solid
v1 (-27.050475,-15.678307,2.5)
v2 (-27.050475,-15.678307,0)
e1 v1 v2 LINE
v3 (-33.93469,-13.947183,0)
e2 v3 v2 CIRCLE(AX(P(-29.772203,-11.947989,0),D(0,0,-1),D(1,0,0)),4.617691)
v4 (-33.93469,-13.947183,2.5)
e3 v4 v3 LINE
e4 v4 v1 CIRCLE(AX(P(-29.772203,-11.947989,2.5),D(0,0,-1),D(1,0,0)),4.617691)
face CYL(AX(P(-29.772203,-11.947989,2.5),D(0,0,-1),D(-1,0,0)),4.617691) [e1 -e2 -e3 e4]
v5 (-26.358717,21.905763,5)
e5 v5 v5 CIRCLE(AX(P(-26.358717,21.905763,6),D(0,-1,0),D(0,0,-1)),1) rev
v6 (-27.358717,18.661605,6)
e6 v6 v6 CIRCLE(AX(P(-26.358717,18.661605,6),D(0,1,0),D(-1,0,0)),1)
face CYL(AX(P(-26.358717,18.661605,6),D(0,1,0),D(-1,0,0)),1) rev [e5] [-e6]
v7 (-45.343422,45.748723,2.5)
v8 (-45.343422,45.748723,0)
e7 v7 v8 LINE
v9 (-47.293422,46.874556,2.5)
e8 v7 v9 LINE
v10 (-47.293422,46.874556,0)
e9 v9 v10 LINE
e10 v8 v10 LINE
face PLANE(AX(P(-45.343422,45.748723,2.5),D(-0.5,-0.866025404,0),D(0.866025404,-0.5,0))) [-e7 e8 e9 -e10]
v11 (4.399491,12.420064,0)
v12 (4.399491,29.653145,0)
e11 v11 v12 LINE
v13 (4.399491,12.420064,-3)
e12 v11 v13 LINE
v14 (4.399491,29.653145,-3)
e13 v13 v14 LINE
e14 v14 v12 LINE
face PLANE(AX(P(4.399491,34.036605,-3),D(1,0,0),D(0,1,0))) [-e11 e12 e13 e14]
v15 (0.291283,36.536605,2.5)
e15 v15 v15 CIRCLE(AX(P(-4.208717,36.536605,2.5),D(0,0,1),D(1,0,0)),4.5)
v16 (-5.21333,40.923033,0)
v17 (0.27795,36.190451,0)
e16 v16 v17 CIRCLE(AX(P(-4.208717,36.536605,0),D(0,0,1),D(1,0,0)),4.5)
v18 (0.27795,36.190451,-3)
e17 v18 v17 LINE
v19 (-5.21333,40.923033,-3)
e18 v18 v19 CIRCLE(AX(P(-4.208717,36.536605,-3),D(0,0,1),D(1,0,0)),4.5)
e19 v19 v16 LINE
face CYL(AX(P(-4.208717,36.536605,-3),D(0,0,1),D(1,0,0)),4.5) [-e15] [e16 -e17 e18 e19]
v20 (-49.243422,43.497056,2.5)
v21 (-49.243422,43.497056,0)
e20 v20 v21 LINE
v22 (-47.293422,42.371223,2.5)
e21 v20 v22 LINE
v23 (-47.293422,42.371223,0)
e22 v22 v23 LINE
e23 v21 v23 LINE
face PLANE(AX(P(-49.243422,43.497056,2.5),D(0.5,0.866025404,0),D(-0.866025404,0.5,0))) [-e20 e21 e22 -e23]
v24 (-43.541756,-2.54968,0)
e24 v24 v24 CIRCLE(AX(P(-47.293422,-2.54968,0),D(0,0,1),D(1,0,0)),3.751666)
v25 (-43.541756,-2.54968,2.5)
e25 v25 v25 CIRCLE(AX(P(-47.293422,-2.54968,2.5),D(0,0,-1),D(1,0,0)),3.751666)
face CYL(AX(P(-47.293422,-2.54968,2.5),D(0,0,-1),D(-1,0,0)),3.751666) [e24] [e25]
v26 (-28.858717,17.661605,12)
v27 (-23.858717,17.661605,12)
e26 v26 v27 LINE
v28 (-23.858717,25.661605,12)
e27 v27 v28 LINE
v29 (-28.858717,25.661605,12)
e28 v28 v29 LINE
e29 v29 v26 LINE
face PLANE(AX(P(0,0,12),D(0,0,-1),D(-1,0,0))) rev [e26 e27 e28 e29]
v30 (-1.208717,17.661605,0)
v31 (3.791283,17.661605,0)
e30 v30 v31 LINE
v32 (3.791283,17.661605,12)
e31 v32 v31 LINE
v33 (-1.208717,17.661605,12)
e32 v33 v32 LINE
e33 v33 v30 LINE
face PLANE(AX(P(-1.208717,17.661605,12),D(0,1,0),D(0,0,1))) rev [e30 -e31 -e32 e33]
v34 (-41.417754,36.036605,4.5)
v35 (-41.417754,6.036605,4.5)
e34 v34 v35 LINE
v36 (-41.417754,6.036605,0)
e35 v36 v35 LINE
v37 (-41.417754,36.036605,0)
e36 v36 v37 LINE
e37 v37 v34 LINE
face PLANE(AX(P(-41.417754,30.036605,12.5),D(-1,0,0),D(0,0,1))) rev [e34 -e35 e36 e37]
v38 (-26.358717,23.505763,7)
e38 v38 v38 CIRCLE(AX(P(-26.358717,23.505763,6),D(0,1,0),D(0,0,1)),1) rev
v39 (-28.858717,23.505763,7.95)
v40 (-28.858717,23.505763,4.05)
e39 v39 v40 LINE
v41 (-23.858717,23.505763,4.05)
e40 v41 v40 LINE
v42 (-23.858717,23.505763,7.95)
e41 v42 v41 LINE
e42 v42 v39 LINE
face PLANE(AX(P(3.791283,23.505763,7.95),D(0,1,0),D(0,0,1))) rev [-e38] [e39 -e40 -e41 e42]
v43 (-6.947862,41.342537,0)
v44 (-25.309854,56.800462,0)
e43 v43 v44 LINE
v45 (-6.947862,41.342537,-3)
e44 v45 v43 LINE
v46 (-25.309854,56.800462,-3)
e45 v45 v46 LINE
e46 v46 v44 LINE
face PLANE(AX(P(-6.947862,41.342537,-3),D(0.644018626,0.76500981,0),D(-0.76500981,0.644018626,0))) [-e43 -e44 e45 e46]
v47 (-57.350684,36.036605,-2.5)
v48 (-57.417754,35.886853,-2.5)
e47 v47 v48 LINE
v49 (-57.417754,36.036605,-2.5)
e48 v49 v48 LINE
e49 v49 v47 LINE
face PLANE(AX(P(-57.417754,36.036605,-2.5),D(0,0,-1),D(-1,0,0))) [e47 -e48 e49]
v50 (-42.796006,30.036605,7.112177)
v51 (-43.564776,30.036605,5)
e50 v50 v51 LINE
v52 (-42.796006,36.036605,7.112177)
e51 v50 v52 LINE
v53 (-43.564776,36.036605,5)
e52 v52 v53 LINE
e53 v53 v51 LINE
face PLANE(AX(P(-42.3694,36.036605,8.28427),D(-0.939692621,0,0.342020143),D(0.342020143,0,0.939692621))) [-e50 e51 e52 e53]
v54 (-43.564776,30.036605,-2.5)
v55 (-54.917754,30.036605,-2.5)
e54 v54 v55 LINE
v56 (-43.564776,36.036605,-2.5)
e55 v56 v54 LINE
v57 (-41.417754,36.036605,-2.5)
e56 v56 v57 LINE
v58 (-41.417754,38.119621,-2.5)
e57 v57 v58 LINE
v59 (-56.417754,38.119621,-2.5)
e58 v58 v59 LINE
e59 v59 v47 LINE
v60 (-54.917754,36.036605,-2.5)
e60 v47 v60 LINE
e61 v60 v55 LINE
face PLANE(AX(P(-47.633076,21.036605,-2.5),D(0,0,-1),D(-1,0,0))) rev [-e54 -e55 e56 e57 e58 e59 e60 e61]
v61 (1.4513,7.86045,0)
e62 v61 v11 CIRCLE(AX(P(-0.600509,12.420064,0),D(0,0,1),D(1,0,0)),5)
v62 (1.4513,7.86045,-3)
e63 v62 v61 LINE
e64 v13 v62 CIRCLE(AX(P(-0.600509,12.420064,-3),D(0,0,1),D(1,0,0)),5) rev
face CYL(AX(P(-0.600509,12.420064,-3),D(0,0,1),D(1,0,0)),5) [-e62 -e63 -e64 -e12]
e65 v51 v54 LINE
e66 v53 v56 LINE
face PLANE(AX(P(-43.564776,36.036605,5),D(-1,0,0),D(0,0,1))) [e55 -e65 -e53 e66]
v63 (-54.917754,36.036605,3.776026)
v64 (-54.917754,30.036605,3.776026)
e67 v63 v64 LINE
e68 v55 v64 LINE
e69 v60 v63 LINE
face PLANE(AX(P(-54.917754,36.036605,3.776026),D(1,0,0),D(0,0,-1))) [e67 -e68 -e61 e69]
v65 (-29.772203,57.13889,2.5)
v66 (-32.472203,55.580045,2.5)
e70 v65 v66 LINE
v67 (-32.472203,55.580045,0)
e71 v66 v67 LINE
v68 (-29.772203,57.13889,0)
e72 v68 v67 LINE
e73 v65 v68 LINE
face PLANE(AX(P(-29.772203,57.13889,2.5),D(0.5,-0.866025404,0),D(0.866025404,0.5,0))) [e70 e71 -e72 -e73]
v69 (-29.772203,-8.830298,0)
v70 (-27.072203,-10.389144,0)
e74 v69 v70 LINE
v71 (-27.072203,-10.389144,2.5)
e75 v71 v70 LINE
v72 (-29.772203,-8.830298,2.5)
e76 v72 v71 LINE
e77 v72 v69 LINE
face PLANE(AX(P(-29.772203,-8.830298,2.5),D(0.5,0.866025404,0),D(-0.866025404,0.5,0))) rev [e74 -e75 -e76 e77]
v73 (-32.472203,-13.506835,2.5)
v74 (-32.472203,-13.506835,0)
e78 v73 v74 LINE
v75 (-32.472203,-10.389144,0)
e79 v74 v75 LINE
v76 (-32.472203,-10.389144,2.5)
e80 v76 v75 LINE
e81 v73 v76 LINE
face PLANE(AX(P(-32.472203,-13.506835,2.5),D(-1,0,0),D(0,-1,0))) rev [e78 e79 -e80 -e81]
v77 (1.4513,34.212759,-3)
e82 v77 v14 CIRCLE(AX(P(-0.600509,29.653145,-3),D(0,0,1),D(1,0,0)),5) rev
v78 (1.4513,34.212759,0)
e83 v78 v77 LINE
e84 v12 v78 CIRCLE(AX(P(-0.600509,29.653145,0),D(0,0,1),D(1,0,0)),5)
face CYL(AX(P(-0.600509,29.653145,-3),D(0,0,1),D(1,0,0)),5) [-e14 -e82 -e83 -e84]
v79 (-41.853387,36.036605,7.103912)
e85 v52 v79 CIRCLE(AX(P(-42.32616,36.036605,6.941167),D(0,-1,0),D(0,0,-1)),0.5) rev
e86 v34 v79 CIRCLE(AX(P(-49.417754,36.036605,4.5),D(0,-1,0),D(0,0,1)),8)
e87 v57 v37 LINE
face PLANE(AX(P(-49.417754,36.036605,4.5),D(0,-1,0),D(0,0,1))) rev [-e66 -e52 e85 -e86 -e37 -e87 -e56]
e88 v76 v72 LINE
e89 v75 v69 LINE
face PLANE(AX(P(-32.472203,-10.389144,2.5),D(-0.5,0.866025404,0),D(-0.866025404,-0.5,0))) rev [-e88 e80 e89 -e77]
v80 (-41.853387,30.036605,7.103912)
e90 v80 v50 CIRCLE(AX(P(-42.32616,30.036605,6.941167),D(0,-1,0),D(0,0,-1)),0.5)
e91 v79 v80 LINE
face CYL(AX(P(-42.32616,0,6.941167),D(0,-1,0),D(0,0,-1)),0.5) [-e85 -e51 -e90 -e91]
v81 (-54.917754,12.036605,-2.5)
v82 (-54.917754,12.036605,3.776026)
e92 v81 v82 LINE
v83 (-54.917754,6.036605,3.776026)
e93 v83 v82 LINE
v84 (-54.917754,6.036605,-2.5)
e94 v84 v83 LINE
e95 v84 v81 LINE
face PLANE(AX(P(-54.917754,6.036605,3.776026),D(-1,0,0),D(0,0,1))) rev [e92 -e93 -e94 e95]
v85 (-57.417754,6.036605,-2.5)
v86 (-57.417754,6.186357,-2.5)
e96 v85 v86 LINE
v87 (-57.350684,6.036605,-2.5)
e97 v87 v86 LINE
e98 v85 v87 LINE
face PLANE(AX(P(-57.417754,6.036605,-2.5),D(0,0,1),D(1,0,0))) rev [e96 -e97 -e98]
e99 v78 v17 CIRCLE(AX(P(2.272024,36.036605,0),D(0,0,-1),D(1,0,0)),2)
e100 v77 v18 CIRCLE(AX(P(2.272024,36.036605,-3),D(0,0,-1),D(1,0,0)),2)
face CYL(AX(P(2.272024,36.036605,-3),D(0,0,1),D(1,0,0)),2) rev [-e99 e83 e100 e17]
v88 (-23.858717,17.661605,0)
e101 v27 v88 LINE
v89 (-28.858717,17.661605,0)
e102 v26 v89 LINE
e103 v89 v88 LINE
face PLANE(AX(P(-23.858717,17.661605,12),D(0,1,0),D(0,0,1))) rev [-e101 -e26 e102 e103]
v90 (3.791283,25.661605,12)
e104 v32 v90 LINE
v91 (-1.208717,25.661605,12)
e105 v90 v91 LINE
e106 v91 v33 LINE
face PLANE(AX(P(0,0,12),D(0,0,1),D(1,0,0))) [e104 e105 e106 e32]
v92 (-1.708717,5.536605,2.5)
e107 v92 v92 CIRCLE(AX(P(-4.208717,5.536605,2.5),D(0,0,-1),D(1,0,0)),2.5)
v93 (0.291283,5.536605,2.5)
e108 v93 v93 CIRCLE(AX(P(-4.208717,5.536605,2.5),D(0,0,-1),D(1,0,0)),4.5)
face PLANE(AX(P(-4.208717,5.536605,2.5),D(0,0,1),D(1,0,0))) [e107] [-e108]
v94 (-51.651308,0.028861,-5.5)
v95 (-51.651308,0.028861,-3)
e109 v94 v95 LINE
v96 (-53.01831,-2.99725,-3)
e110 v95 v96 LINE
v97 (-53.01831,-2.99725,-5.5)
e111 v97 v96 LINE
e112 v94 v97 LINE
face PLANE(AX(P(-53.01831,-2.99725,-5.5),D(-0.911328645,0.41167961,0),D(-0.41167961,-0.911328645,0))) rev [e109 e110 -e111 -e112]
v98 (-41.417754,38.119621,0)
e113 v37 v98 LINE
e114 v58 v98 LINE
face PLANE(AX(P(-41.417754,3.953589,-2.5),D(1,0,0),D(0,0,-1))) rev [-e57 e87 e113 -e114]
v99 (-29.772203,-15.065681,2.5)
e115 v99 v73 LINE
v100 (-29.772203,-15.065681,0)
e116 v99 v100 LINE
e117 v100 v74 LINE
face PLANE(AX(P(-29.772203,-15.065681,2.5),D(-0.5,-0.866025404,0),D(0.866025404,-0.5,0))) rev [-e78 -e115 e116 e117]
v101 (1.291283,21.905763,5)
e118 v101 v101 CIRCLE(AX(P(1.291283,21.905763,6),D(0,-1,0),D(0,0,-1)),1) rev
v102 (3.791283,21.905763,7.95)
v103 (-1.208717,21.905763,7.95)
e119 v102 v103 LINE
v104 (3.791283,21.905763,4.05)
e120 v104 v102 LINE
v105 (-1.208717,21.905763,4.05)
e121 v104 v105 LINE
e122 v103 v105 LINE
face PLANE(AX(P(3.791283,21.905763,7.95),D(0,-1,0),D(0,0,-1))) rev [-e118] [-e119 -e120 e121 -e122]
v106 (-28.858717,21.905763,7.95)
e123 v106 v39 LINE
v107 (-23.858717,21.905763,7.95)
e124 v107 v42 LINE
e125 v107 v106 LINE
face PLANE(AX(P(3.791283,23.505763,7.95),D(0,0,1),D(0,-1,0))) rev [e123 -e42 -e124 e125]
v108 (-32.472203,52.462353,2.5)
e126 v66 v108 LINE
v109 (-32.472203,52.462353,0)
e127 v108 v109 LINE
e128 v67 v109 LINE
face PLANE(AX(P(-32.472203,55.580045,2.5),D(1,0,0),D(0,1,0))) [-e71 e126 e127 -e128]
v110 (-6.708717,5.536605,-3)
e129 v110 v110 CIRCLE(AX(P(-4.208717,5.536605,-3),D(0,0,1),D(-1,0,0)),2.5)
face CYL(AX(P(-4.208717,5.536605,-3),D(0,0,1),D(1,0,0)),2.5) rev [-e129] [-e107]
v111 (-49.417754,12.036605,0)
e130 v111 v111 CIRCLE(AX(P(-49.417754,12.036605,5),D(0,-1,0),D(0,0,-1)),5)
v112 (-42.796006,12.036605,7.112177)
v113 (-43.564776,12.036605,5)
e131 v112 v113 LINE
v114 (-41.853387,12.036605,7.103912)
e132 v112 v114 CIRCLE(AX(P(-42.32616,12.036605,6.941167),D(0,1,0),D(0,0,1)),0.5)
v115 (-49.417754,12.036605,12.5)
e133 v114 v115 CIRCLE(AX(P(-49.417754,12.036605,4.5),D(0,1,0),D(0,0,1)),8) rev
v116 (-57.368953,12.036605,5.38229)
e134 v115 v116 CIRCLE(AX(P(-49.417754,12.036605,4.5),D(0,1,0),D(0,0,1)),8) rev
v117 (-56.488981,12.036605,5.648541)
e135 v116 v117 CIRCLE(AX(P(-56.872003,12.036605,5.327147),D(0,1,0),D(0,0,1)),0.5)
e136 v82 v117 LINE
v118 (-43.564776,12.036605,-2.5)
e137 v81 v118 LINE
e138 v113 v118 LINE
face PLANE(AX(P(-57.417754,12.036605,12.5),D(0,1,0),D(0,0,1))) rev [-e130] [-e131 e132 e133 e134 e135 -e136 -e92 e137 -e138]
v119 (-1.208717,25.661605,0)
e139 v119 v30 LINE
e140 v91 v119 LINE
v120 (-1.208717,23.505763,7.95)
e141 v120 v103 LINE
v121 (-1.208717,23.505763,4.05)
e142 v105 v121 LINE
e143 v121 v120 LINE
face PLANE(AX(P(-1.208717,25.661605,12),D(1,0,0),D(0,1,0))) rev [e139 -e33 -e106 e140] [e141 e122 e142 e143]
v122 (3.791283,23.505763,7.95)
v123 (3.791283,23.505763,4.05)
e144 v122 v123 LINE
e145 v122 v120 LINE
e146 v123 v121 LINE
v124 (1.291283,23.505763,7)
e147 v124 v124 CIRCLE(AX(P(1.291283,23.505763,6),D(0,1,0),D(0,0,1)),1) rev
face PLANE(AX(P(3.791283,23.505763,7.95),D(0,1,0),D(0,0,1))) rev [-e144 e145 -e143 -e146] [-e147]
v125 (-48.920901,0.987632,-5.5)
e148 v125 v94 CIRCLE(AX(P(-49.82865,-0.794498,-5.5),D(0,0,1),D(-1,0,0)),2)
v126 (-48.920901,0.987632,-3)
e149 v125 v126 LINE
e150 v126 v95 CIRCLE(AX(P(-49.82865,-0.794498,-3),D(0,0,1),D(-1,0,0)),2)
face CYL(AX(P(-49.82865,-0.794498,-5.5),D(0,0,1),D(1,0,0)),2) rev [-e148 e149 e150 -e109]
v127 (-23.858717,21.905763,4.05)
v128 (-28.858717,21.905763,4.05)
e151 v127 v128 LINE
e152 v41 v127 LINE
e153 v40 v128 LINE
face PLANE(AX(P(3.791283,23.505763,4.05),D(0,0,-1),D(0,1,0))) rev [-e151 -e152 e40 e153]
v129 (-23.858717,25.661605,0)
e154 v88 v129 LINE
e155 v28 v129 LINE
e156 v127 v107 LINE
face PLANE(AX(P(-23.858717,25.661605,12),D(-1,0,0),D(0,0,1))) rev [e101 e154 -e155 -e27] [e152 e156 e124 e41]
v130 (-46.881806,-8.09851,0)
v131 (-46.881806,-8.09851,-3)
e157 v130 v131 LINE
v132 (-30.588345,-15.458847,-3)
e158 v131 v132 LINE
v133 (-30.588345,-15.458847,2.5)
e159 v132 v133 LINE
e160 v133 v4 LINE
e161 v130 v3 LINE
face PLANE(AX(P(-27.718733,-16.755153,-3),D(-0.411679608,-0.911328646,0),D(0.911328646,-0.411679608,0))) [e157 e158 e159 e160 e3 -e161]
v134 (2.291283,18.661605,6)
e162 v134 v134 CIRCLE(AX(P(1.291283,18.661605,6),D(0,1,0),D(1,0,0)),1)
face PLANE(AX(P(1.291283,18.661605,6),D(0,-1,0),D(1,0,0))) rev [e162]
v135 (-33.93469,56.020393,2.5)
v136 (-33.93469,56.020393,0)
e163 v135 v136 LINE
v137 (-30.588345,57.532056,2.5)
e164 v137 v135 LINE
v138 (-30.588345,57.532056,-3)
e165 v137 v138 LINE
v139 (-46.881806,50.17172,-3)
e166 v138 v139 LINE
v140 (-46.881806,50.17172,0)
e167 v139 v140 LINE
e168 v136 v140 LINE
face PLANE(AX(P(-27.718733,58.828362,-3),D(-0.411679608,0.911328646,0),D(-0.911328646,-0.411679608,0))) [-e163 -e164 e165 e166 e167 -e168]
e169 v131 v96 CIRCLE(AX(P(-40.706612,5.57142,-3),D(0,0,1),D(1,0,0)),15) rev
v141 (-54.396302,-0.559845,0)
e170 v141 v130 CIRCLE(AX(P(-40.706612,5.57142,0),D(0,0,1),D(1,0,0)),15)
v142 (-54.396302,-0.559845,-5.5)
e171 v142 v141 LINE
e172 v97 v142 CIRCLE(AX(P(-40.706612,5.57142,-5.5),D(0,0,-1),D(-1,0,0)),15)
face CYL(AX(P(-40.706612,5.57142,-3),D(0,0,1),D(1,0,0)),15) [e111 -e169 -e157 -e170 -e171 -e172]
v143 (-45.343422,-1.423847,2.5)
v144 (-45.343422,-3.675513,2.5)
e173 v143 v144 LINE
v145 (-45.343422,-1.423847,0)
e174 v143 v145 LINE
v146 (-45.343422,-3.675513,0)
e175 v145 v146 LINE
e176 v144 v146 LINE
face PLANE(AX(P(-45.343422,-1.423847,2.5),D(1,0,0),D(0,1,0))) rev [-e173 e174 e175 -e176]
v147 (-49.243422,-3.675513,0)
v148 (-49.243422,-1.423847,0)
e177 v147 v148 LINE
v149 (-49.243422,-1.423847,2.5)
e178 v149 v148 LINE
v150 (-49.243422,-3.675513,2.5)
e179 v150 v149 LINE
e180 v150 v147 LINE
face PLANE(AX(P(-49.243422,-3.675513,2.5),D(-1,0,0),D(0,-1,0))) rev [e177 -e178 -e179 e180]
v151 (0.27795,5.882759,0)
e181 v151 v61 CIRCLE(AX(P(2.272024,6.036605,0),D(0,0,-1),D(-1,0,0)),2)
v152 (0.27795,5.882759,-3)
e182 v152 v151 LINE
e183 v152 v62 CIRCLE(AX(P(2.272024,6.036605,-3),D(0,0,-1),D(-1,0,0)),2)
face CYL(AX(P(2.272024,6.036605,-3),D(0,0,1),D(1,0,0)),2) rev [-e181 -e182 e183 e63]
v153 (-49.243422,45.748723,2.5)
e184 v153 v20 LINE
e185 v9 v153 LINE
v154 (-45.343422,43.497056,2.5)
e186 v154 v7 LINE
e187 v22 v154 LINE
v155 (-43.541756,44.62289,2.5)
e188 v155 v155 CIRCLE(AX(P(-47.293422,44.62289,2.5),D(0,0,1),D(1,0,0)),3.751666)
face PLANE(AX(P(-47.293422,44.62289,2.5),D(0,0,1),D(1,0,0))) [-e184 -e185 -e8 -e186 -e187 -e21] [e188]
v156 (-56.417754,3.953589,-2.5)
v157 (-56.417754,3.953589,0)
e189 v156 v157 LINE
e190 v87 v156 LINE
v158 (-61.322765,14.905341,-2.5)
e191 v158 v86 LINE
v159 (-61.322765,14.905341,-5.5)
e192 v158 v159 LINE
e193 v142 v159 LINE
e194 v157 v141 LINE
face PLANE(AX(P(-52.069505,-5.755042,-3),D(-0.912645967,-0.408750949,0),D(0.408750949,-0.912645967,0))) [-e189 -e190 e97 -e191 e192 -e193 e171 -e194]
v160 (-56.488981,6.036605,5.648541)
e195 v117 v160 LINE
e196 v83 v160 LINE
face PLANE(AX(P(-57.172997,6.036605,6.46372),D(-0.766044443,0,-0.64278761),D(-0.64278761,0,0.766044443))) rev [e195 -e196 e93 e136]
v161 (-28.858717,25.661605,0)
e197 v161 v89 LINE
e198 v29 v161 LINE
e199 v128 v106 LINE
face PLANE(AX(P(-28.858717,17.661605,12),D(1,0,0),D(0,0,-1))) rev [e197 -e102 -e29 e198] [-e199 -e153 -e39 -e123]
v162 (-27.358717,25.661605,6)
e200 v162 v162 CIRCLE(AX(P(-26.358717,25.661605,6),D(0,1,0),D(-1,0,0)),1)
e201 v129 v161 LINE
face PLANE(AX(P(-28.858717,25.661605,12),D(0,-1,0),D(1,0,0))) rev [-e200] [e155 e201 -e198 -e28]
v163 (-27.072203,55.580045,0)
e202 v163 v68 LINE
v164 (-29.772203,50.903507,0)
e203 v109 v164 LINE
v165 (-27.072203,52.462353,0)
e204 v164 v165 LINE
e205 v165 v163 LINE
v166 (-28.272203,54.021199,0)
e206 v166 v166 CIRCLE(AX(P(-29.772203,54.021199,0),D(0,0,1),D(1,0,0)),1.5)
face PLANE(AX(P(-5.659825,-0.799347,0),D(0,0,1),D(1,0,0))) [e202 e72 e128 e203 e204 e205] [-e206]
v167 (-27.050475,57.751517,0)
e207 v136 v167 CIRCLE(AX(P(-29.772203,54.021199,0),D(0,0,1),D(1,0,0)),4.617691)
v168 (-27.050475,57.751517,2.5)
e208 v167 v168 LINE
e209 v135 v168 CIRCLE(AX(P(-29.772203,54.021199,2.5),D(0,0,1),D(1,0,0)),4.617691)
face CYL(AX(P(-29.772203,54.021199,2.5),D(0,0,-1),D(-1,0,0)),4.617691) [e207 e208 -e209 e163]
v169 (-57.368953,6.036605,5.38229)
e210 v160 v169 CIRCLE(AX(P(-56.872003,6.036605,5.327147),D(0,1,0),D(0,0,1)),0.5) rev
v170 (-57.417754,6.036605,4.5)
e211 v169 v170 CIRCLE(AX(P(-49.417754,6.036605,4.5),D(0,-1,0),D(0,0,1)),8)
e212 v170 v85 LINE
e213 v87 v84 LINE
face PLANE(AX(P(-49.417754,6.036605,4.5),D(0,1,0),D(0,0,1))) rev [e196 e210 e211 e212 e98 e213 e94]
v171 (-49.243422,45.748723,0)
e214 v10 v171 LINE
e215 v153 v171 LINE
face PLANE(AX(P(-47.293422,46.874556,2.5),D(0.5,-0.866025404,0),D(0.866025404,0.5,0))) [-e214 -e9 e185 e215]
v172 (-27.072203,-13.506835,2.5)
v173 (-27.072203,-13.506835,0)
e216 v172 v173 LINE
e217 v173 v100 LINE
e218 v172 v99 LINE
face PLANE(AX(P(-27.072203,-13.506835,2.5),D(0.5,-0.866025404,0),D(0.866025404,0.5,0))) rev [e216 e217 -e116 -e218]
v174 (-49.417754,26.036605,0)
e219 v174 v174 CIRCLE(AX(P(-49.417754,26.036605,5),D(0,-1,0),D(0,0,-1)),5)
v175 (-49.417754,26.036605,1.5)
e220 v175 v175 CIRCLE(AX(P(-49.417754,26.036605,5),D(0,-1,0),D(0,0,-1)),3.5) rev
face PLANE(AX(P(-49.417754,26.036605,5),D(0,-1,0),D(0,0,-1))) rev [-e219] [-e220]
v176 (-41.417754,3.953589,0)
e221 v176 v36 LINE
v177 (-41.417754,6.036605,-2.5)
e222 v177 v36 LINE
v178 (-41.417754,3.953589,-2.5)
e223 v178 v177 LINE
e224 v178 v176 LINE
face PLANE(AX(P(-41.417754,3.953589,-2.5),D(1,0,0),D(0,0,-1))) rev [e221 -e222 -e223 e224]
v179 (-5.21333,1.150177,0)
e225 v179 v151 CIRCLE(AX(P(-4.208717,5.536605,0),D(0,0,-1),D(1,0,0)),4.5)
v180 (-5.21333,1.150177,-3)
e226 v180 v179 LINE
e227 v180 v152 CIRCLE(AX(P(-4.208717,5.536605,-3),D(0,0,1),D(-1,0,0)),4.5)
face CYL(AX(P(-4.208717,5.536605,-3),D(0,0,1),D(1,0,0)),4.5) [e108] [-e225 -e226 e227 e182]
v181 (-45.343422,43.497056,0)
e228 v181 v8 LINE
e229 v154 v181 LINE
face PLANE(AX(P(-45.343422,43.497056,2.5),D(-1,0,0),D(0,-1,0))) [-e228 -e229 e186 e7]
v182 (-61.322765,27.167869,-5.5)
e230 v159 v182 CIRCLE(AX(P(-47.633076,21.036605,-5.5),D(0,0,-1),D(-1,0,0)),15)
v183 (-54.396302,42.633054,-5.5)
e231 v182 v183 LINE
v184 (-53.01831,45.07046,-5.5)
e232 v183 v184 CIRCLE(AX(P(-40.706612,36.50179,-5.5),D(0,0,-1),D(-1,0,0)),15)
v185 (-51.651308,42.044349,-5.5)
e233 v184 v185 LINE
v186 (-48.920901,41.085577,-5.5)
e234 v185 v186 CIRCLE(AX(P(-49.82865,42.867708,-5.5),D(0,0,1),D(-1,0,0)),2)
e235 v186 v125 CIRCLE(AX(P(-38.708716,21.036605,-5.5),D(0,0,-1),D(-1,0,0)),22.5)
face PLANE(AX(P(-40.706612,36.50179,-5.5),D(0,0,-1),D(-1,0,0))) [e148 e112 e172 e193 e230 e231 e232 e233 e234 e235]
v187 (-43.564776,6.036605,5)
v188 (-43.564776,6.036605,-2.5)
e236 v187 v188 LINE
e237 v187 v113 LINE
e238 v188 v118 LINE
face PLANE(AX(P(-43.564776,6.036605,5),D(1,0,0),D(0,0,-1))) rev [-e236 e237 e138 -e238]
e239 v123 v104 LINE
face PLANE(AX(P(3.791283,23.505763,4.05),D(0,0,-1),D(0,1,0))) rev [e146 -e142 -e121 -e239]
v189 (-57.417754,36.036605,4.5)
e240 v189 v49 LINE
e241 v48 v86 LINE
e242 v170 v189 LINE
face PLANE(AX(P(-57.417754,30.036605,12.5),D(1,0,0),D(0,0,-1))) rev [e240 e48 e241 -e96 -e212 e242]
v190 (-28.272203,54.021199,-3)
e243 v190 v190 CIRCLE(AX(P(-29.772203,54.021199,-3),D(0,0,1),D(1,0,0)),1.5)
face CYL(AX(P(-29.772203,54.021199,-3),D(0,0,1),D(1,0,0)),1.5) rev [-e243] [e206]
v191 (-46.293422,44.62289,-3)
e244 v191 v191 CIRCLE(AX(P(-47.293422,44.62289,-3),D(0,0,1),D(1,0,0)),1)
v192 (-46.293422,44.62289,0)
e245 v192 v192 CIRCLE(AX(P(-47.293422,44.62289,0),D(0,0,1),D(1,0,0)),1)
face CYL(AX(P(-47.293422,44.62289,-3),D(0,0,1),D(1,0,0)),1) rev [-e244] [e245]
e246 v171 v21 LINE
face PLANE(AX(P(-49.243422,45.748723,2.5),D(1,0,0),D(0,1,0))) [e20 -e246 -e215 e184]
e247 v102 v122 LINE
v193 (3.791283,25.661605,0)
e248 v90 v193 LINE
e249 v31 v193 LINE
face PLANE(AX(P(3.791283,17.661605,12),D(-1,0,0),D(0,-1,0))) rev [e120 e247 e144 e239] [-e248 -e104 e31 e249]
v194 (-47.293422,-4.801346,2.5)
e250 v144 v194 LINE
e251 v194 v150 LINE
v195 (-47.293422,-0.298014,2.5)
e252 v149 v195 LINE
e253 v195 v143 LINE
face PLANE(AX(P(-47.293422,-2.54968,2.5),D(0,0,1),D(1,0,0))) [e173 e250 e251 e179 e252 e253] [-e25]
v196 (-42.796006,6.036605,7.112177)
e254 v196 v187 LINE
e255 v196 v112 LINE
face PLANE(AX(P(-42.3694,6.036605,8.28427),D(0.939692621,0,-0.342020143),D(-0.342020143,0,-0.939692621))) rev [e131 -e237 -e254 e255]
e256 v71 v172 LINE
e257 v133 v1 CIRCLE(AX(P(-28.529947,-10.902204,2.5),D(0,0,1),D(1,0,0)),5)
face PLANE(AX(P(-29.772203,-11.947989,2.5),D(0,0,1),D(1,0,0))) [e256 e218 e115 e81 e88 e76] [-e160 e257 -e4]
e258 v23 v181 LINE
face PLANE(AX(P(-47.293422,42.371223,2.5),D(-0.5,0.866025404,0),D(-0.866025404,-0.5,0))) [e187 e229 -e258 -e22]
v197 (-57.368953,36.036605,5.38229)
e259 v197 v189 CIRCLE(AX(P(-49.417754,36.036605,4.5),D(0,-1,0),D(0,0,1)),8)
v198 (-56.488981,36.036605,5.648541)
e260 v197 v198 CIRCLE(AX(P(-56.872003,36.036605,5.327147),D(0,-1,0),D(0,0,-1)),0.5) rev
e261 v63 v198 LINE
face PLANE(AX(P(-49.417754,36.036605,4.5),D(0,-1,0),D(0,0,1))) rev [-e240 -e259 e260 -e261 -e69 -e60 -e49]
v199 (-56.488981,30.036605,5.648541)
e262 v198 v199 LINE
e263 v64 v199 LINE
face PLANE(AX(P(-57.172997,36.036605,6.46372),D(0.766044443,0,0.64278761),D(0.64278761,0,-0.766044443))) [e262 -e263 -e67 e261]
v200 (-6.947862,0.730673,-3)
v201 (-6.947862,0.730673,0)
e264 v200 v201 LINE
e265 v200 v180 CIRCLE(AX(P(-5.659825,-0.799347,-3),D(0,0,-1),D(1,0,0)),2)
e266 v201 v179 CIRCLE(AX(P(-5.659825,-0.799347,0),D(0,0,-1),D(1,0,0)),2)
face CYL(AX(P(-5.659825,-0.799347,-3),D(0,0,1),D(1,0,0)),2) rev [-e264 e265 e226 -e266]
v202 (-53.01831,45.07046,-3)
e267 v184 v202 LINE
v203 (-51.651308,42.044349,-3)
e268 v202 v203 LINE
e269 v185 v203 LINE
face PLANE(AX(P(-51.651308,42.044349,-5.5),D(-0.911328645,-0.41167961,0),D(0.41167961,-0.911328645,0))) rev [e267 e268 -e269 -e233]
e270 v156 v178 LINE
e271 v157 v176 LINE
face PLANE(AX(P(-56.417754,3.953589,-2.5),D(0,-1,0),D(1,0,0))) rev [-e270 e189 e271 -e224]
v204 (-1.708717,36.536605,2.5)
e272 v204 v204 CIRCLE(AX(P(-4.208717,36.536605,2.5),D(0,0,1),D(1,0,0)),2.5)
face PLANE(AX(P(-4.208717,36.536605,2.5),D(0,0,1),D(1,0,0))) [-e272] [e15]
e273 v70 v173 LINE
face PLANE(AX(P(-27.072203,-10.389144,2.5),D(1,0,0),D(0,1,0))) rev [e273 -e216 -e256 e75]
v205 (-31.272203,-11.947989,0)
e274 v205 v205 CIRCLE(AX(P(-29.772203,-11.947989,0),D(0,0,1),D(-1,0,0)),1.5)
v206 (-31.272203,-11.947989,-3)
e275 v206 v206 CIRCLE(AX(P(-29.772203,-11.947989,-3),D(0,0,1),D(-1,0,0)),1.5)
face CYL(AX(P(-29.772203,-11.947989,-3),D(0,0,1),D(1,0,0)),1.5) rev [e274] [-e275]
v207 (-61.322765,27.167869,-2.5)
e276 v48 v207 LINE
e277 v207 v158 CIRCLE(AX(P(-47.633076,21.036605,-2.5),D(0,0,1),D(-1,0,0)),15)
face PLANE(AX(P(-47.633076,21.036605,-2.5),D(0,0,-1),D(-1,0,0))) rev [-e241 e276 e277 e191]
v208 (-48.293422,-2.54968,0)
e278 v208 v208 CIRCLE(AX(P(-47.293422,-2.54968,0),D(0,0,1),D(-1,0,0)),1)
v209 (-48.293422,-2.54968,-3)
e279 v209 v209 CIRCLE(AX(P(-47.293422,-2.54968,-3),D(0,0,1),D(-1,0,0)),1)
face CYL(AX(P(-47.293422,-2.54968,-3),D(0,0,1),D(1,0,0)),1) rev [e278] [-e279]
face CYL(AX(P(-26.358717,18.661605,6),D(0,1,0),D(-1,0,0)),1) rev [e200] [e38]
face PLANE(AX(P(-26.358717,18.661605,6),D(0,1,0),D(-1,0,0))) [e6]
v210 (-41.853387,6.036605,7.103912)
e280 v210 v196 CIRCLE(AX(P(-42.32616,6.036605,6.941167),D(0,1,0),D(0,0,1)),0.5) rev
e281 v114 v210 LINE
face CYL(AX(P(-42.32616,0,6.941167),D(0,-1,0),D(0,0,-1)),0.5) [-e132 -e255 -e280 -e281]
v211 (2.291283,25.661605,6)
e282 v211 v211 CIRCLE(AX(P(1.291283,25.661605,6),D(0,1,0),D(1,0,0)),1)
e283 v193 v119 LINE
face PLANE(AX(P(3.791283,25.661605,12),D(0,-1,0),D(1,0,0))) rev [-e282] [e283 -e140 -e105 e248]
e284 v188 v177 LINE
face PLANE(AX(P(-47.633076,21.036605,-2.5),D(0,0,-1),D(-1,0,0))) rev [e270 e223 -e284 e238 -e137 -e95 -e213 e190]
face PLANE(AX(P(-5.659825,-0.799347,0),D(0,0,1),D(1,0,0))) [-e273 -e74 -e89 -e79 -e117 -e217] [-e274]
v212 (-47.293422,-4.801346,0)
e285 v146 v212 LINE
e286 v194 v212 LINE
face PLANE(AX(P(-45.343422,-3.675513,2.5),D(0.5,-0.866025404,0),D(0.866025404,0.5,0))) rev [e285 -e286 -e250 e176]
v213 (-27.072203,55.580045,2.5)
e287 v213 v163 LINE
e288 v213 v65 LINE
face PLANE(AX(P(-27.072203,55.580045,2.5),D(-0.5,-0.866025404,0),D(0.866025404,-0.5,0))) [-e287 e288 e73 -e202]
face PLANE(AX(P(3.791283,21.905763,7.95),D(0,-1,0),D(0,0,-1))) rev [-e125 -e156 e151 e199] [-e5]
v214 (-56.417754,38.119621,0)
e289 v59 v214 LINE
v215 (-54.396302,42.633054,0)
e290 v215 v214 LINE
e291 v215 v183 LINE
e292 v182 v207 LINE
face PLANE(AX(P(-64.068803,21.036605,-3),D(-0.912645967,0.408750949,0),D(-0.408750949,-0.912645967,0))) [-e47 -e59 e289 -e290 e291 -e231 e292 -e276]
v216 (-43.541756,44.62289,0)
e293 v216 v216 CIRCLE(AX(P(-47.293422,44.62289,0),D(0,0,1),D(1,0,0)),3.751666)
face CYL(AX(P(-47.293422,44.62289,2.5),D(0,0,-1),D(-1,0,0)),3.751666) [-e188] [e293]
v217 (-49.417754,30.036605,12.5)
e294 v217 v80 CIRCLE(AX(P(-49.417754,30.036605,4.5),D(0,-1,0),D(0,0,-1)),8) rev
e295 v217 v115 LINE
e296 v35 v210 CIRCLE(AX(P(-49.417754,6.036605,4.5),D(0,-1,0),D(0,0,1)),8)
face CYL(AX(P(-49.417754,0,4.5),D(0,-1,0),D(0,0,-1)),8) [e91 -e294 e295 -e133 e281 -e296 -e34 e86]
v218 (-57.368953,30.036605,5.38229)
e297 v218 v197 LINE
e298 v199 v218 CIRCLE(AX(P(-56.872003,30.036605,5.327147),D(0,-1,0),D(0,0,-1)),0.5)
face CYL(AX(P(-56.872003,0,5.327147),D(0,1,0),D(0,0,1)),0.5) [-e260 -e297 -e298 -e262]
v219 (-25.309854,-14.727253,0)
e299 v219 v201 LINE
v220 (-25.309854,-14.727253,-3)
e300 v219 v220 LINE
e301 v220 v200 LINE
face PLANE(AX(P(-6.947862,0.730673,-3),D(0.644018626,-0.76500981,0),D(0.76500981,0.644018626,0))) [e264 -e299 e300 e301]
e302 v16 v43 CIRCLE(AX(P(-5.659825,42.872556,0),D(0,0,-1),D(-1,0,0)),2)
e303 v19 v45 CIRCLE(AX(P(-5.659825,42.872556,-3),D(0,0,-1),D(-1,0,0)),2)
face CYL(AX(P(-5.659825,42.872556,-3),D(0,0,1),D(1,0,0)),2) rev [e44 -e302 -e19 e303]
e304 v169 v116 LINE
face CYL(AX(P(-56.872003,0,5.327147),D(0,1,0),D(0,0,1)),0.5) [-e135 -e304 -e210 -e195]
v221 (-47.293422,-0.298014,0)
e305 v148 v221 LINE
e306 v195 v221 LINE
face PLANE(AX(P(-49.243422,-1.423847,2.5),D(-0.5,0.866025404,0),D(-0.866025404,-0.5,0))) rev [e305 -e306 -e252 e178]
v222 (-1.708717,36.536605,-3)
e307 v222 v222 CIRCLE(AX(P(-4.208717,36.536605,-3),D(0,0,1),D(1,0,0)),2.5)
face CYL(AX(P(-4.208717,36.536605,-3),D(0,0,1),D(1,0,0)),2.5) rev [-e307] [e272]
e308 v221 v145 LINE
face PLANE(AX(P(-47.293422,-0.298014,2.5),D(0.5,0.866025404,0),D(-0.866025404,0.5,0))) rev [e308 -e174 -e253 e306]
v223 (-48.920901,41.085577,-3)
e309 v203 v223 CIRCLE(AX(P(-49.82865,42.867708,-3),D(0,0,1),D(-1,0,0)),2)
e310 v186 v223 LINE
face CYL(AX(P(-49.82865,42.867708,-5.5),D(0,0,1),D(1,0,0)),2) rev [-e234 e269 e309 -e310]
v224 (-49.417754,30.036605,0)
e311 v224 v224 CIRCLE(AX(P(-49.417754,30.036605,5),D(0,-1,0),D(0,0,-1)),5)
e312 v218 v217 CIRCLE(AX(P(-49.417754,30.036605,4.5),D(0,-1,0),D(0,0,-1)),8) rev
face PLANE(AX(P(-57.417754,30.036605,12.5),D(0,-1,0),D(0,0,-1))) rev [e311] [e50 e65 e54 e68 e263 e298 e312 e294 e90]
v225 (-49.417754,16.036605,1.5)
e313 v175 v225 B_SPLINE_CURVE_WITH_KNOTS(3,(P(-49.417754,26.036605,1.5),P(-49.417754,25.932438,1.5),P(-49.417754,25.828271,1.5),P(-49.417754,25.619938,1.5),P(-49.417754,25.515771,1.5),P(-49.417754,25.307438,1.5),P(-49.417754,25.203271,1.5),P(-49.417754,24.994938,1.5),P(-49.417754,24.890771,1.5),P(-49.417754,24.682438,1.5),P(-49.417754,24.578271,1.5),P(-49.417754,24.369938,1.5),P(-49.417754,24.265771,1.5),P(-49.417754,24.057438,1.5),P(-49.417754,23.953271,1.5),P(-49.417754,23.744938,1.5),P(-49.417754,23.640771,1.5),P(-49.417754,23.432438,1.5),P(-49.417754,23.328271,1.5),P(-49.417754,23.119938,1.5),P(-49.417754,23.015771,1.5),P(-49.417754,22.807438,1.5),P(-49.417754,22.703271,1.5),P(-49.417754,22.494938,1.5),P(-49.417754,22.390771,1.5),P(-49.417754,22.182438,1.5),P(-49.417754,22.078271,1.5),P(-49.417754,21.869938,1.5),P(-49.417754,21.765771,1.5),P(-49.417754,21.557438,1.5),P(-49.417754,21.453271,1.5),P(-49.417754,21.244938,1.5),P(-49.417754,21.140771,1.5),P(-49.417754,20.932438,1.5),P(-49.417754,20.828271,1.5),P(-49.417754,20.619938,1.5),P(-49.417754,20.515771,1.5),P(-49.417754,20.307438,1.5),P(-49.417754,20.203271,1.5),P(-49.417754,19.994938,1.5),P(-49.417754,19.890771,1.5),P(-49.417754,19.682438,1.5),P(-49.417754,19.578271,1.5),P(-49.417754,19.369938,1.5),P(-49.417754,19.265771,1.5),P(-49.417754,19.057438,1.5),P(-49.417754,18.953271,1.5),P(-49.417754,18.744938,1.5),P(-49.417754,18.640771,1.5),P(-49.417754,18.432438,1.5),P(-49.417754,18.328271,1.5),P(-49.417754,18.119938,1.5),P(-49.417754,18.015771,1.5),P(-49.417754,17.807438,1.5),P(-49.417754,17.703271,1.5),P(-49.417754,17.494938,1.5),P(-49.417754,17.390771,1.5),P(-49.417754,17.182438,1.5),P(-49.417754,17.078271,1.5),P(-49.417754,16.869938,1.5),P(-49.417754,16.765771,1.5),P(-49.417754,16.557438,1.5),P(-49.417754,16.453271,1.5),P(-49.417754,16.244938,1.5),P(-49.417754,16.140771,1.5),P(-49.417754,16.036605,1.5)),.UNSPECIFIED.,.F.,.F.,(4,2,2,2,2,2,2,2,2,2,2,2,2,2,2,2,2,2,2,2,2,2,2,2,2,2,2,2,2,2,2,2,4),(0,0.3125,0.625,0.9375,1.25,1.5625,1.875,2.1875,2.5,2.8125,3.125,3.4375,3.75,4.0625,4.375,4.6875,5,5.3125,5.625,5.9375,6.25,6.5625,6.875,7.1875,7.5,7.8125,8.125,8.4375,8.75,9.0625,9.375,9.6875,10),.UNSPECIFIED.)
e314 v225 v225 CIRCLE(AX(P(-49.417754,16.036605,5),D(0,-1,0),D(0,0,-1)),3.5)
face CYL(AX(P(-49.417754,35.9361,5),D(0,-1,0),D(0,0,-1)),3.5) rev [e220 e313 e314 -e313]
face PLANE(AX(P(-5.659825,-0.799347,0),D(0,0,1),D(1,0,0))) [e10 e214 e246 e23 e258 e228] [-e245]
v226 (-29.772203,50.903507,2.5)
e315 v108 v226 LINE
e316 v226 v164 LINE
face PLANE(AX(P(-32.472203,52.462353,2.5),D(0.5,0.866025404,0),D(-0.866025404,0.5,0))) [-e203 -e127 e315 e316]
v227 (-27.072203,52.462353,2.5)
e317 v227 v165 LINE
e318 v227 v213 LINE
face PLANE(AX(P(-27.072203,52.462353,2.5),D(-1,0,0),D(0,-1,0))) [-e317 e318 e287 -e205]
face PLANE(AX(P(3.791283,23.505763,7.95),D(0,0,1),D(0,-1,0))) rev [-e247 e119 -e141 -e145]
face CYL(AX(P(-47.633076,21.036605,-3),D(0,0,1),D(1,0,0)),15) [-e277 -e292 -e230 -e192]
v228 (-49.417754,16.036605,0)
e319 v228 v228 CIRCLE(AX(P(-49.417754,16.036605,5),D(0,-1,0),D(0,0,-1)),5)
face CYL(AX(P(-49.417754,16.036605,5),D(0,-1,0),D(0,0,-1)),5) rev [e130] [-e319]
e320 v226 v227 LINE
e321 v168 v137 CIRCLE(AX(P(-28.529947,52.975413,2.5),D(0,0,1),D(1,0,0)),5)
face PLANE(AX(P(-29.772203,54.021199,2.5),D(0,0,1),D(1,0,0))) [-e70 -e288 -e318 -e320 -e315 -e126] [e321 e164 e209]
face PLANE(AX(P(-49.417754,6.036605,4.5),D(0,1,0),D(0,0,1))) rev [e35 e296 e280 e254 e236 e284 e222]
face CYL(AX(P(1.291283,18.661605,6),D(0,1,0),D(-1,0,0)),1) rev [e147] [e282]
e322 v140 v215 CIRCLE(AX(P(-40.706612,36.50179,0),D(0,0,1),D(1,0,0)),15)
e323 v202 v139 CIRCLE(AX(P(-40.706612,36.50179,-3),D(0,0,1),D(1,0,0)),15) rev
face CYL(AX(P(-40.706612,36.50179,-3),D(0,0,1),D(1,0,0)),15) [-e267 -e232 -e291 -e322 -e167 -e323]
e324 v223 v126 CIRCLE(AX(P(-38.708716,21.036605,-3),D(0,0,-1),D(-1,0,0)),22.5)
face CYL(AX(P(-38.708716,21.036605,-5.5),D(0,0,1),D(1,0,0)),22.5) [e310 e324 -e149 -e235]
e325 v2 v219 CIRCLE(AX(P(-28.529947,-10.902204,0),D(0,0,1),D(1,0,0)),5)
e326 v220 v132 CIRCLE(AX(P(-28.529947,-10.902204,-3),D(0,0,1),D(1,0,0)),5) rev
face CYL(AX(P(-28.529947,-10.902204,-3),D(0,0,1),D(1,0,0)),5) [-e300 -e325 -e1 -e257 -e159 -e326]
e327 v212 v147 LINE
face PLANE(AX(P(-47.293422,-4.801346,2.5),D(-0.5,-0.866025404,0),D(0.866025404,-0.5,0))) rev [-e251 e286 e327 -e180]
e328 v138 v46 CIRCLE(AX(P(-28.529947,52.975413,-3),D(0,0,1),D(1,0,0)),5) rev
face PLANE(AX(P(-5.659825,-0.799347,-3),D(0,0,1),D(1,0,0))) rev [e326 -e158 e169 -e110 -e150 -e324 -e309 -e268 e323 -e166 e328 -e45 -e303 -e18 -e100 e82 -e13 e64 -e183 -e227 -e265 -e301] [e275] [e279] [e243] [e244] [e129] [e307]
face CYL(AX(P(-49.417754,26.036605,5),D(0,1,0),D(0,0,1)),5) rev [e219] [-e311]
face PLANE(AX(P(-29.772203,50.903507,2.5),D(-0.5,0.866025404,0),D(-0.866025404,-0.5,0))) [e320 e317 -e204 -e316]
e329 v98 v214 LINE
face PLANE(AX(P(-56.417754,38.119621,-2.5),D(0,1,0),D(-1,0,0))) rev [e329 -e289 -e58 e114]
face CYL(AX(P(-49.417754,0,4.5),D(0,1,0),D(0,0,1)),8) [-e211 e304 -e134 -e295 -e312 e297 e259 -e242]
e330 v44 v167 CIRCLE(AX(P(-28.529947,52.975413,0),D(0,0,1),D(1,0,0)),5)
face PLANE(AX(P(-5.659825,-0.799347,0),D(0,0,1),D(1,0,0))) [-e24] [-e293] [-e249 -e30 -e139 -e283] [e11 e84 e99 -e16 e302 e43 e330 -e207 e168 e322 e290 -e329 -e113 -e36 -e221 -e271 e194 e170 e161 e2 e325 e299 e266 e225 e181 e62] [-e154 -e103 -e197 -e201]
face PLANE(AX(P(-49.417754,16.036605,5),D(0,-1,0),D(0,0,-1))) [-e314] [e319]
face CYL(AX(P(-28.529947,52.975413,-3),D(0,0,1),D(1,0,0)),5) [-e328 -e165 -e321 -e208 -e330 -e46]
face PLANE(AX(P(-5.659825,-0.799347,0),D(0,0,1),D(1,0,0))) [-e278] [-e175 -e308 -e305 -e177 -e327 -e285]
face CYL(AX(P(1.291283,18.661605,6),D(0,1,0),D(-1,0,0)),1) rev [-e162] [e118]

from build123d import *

# Parameters (mm, degrees)
CROQUIS3_R                = 2.5000000000000027
CROQUIS3_R_2              = 1.5000000000000009
CROQUIS3_R_3              = 0.9999999999999983
CROQUIS3_R_4              = 2.5000000000000013
SALIENTE_EXTRUIR1_DEPTH   = 3
SALIENTE_EXTRUIR2_DEPTH   = 12
CROQUIS6_R                = 1.0000000000000013
CROQUIS6_R_2              = 1.0000000000000002
CORTAR_EXTRUIR1_DEPTH     = 7
SALIENTE_EXTRUIR4_START   = 2.5
CROQUIS10_R               = 3.751666049839528
CROQUIS10_R_2             = 4.499999999999995
CROQUIS10_R_3             = 2.5000000000000036
SALIENTE_EXTRUIR4_DEPTH   = 2.5
REDONDEO4_R               = 15
REDONDEO5_R               = 5
SALIENTE_EXTRUIR6_START   = 2.5
SALIENTE_EXTRUIR6_DEPTH   = 2.5
CORTAR_EXTRUIR5_START     = -2.5
CORTAR_EXTRUIR5_DEPTH     = 2.5
CROQUIS16_W               = 16
CROQUIS16_H               = 17.999999999999993
SALIENTE_EXTRUIR7_DEPTH   = 15
CROQUIS8_R                = 4.999999999999997
CORTAR_EXTRUIR2_DEPTH     = 4
CORTAR_EXTRUIR3_START     = -14
CROQUIS8_2_R              = 4.999999999999997
CORTAR_EXTRUIR3_DEPTH     = 4
CROQUIS12_R               = 3.5000000000000004
CORTAR_EXTRUIR4_DEPTH     = 10
REDONDEO6_R               = 8
SALIENTE_EXTRUIR8_DEPTH   = 6
REDONDEO10_R              = 0.5
REDONDEO10_OF_SIMETR_A3_R = 0.5
CORTAR_EXTRUIR6_DEPTH     = 32.65


with BuildPart() as part:
    # Croquis3 → Saliente-Extruir1 (new body)
    with BuildSketch(Plane.XY):
        with BuildLine():
            Line((-6.94786223448668, 41.342536860149195), (-27.71873339137468, 58.82836217622058))
            Line((-27.71873339137468, 58.82836217622058), (-52.06950472778811, 47.82825147485582))
            Line((-52.06950472778811, 47.82825147485582), (-64.06880280185534, 21.036604802480003))
            Line((-64.06880280185534, 21.036604802480003), (-52.0695047277881, -5.755041869895824))
            Line((-52.0695047277881, -5.755041869895824), (-27.718733391374666, -16.755152571260584))
            Line((-27.718733391374666, -16.755152571260584), (-6.947862234486694, 0.73067274481082))
            ThreePointArc((-6.947862234486694, 0.73067274481082), (-6.129978476714667, 1.1446067487189793), (-5.213330138508751, 1.150176747198823))
            ThreePointArc((-5.213330138508751, 1.150176747198823), (-1.2709443219397119, 2.127867121954703), (0.2779498979146519, 5.882758743729784))
            ThreePointArc((0.2779498979146519, 5.882758743729784), (0.8044251875525397, 7.395337338549455), (2.2720239589632287, 8.036604897575938))
            Line((2.2720239589632287, 8.036604897575938), (4.399490704258791, 8.036604897575932))
            Line((4.399490704258791, 8.036604897575932), (4.399490704258796, 34.036604707384065))
            Line((4.399490704258796, 34.036604707384065), (2.272023958963246, 34.036604707384065))
            ThreePointArc((2.272023958963246, 34.036604707384065), (0.8044251875525599, 34.67787226641055), (0.27794989791467706, 36.190450861230225))
            ThreePointArc((0.27794989791467706, 36.190450861230225), (-1.2709443219396896, 39.94534248300532), (-5.213330138508737, 40.923032857761186))
            ThreePointArc((-5.213330138508737, 40.923032857761186), (-6.129978476714655, 40.92860285624103), (-6.94786223448668, 41.342536860149195))
        make_face()
        with Locations((-4.208716739444608, 36.53660470738407)):
            Circle(CROQUIS3_R, mode=Mode.SUBTRACT)
        with Locations((-29.772203367298626, 54.02119886988243)):
            Circle(CROQUIS3_R_2, mode=Mode.SUBTRACT)
        with Locations((-47.293421876680526, 44.62288950996411)):
            Circle(CROQUIS3_R_3, mode=Mode.SUBTRACT)
        with Locations(Location((-4.208716739444621, 5.536604897575941, 0), (0, 0, 180))):
            Circle(CROQUIS3_R_4, mode=Mode.SUBTRACT)
        with Locations(Location((-47.29342187668052, -2.5496799050041195, 0), (0, 0, 180))):
            Circle(CROQUIS3_R_3, mode=Mode.SUBTRACT)
        with Locations(Location((-29.77220336729862, -11.947989264922445, 0), (0, 0, 180))):
            Circle(CROQUIS3_R_2, mode=Mode.SUBTRACT)
    extrude(amount=-SALIENTE_EXTRUIR1_DEPTH)

    # Croquis5 → Saliente-Extruir2 (add)
    with BuildSketch(Plane.XY):
        Polygon((-28.858716739444507, 25.66160480247996), (-23.858716739444503, 25.661604802479957), (-23.858716739444503, 17.66160480247996), (-28.858716739444507, 17.66160480247996), align=None)
        Polygon((3.7912832605554865, 17.661604802479964), (3.7912832605554794, 25.661604802479964), (-1.208716739444518, 25.66160480247996), (-1.2087167394445146, 17.661604802479964), align=None)
    extrude(amount=SALIENTE_EXTRUIR2_DEPTH)

    # Croquis6 → Cortar-Extruir1 (cut)
    with BuildSketch(Plane(origin=(1.781e-14, 25.661604802479943, 0), x_dir=(1, 6.9e-16, 0), z_dir=(-6.9e-16, 1, 0))):
        with Locations(Location((-26.358716739444525, -6, 0), (0, 0, 180))):
            Circle(CROQUIS6_R)
        with Locations((1.2912832605554667, -6)):
            Circle(CROQUIS6_R_2)
    extrude(amount=-CORTAR_EXTRUIR1_DEPTH, mode=Mode.SUBTRACT)

    # Croquis10 → Saliente-Extruir4 (add)
    # profile 1 of 3: a face of its own
    with BuildSketch(Plane.XY.offset(SALIENTE_EXTRUIR4_START)):
        with Locations((-47.293421876680526, 44.62288950996411)):
            Circle(CROQUIS10_R)
        Polygon((-47.29342187668054, 42.37122346012457), (-45.34342187668052, 43.49705648504435), (-45.34342187668053, 45.74872253488385), (-47.29342187668053, 46.87455555980363), (-49.24342187668053, 45.748722534883875), (-49.24342187668052, 43.49705648504435), align=None, mode=Mode.SUBTRACT)
    # profile 2 of 3: a face of its own
    with BuildSketch(Plane.XY.offset(SALIENTE_EXTRUIR4_START)):
        with Locations((-4.208716739444608, 36.53660470738407)):
            Circle(CROQUIS10_R_2)
        with Locations((-4.208716739444608, 36.53660470738407)):
            Circle(CROQUIS10_R_3, mode=Mode.SUBTRACT)
    # profile 3 of 3: a face of its own
    with BuildSketch(Plane.XY.offset(SALIENTE_EXTRUIR4_START)):
        with BuildLine():
            Line((-28.520730934773418, 58.46607132153967), (-33.93469022724589, 56.020393082968894))
            ThreePointArc((-33.93469022724589, 56.020393082968894), (-27.871193961530338, 49.81296437070674), (-28.520730934773418, 58.46607132153967))
        make_face()
        Polygon((-29.772203367298623, 50.90350741625844), (-27.072203367298624, 52.46235314307043), (-27.072203367298616, 55.580044596694414), (-29.772203367298612, 57.138890323506416), (-32.47220336729861, 55.58004459669444), (-32.472203367298626, 52.462353143070445), align=None, mode=Mode.SUBTRACT)
    saliente_extruir4 = extrude(amount=-SALIENTE_EXTRUIR4_DEPTH)

    # Simetría2: Saliente-Extruir4 across plane
    add(saliente_extruir4.mirror(Plane(origin=(0, 21.036604802479996, 0), x_dir=(0, 0, 1), z_dir=(0, -1, 0))))

    # Redondeo4
    redondeo4_edges = [part.edges().sort_by_distance(p)[0] for p in [
        (-52.0695047277881, -5.755041869895824, -1.5),
        (-64.06880280185534, 21.036604802480003, -1.5),
        (-52.06950472778811, 47.82825147485582, -1.5),
    ]]
    fillet(redondeo4_edges, radius=REDONDEO4_R)

    # Redondeo5
    redondeo5_edges = [part.edges().sort_by_distance(p)[0] for p in [
        (4.399490704258796, 34.036604707384065, -1.5),
        (-27.71873339137468, 58.82836217622058, -1.5),
        (-27.718733391374666, -16.755152571260584, -1.5),
        (4.399490704258791, 8.036604897575932, -1.5),
    ]]
    fillet(redondeo5_edges, radius=REDONDEO5_R)

    # Croquis14 → Saliente-Extruir6 (add)
    with BuildSketch(Plane(origin=(0, 0, -3), x_dir=(-1, 0, 0), z_dir=(0, 0, -1)).offset(SALIENTE_EXTRUIR6_START)):
        with BuildLine():
            Line((53.01830981876134, -2.997250029738774), (51.6513077567385, 0.02886082366314671))
            ThreePointArc((51.6513077567385, 0.02886082366314671), (50.49127760877796, 1.092543010289408), (48.92090073776822, 0.9876324706806112))
            ThreePointArc((48.92090073776822, 0.9876324706806112), (16.2087162792061, 21.03660473613081), (48.9209007518344, 41.085576978630414))
            ThreePointArc((48.9209007518344, 41.085576978630414), (50.49127762343251, 40.98066643815229), (51.65130777205501, 42.044348625011))
            Line((51.65130777205501, 42.044348625011), (53.01830987086137, 45.070459559840025))
            ThreePointArc((53.01830987086137, 45.070459559840025), (53.764302238120166, 43.88397994729048), (54.39630163909832, 42.633054194031175))
            Line((54.39630163909832, 42.633054194031175), (61.322765277499, 27.1678690353972))
            ThreePointArc((61.322765277499, 27.1678690353972), (62.63307576655135, 21.036604802480014), (61.32276527749901, 14.905340569562824))
            Line((61.32276527749901, 14.905340569562824), (54.396301639098304, -0.5598445890711984))
            ThreePointArc((54.396301639098304, -0.5598445890711984), (53.76430221567721, -1.8107703820277914), (53.01830981876134, -2.997250029738774))
        make_face()
    extrude(amount=-SALIENTE_EXTRUIR6_DEPTH)

    # Croquis15 → Cortar-Extruir5 (cut)
    with BuildSketch(Plane.XY.offset(CORTAR_EXTRUIR5_START)):
        with BuildLine():
            Line((-61.32276527749901, 14.905340569562824), (-56.41775389116526, 3.9535889608046952))
            Line((-56.41775389116526, 3.9535889608046952), (-41.417753891165255, 3.953588960804696))
            Line((-41.417753891165255, 3.953588960804696), (-41.417753891165255, 38.119620644155326))
            Line((-41.417753891165255, 38.119620644155326), (-56.41775389116526, 38.11962064415533))
            Line((-56.41775389116526, 38.11962064415533), (-61.32276527749901, 27.167869035397203))
            ThreePointArc((-61.32276527749901, 27.167869035397203), (-62.63307576655134, 21.036604802480017), (-61.32276527749901, 14.905340569562824))
        make_face()
    extrude(amount=CORTAR_EXTRUIR5_DEPTH, mode=Mode.SUBTRACT)

    # Croquis16 → Saliente-Extruir7 (add)
    with BuildSketch(Plane.XY.offset(-2.5)):
        with Locations((-49.41775389116526, 21.03660480248001)):
            Rectangle(CROQUIS16_W, CROQUIS16_H)
    extrude(amount=SALIENTE_EXTRUIR7_DEPTH)

    # Croquis8 → Cortar-Extruir2 (cut)
    with BuildSketch(Plane.XZ.offset(-12.036604802480012)):
        with Locations(Location((-49.41775389116526, 4.999999999999999, 0), (0, 0, 270))):
            Circle(CROQUIS8_R)
    extrude(amount=-CORTAR_EXTRUIR2_DEPTH, mode=Mode.SUBTRACT)

    # Croquis8<2> → Cortar-Extruir3 (cut)
    with BuildSketch(Plane.XZ.offset(-12.036604802480012).offset(CORTAR_EXTRUIR3_START)):
        with Locations(Location((-49.41775389116526, 4.999999999999999, 0), (0, 0, 270))):
            Circle(CROQUIS8_2_R)
    extrude(amount=-CORTAR_EXTRUIR3_DEPTH, mode=Mode.SUBTRACT)

    # Croquis12 → Cortar-Extruir4 (cut)
    with BuildSketch(Plane.XZ.offset(-16.036604802480014)):
        with Locations(Location((-49.41775389116526, 4.999999999999999, 0), (0, 0, 270))):
            Circle(CROQUIS12_R)
    extrude(amount=-CORTAR_EXTRUIR4_DEPTH, mode=Mode.SUBTRACT)

    # Redondeo6
    redondeo6_edges = [part.edges().sort_by_distance(p)[0] for p in [
        (-41.41775389116526, 21.03660480248001, 12.5),
        (-57.41775389116526, 21.036604802480007, 12.5),
    ]]
    fillet(redondeo6_edges, radius=REDONDEO6_R - 0.0001)  # a hair under: the kernel refuses the full size

    # Croquis17 → Saliente-Extruir8 (add)
    with BuildSketch(Plane.XZ.offset(-12.036604802480012)):
        with BuildLine():
            Line((-54.91775389116526, 3.776025624966147), (-54.91775389116526, -2.5000000000000004))
            Line((-54.91775389116526, -2.5000000000000004), (-57.41775389116526, -2.5))
            Line((-57.41775389116526, -2.5), (-57.41775389116526, 4.499999999999943))
            ThreePointArc((-57.41775389116526, 4.499999999999943), (-57.356328969145196, 5.489457291284446), (-57.17299745834626, 6.463720248329115))
            Line((-57.17299745834626, 6.463720248329115), (-54.91775389116526, 3.776025624966147))
        make_face()
        with BuildLine():
            Line((-41.41775389116526, 4.499999999999999), (-41.417753891165255, -2.5))
            Line((-41.417753891165255, -2.5), (-43.56477614254775, -2.5000000000000004))
            Line((-43.56477614254775, -2.5000000000000004), (-43.56477614254775, 5.000000000000022))
            Line((-43.56477614254775, 5.000000000000022), (-42.3693995452198, 8.284270208903127))
            ThreePointArc((-42.3693995452198, 8.284270208903127), (-41.65931220589225, 6.451046543836961), (-41.41775389116526, 4.499999999999999))
        make_face()
    saliente_extruir8 = extrude(amount=SALIENTE_EXTRUIR8_DEPTH)

    # Redondeo10
    redondeo10_edges = [part.edges().sort_by_distance(p)[0] for p in [
        (-57.17299745834626, 9.036604802480012, 6.463720248329115),
        (-42.3693995452198, 9.036604802480012, 8.284270208903127),
    ]]
    fillet(redondeo10_edges, radius=REDONDEO10_R)

    # Simetría3: Saliente-Extruir8 across plane
    add(saliente_extruir8.mirror(Plane(origin=(0, 21.036604802479996, 0), x_dir=(0, 0, 1), z_dir=(0, -1, 0))))

    # Redondeo10 of Simetría3
    redondeo10_of_simetr_a3_edges = [part.edges().sort_by_distance(p)[0] for p in [
        (-57.17299745834626, 33.03660480247998, 6.463720248329115),
        (-42.3693995452198, 33.03660480247998, 8.284270208903127),
    ]]
    fillet(redondeo10_of_simetr_a3_edges, radius=REDONDEO10_OF_SIMETR_A3_R)

    # Croquis18 → Cortar-Extruir6 (cut)
    with BuildSketch(Plane.ZY.offset(28.858716739444507)):
        Polygon((7.95, 23.505763168486737), (4.05, 23.505763168486737), (4.049999999999998, 21.905763168486736), (7.950000000000002, 21.905763168486736), align=None)
    extrude(amount=-CORTAR_EXTRUIR6_DEPTH, mode=Mode.SUBTRACT)


solid = part.part
